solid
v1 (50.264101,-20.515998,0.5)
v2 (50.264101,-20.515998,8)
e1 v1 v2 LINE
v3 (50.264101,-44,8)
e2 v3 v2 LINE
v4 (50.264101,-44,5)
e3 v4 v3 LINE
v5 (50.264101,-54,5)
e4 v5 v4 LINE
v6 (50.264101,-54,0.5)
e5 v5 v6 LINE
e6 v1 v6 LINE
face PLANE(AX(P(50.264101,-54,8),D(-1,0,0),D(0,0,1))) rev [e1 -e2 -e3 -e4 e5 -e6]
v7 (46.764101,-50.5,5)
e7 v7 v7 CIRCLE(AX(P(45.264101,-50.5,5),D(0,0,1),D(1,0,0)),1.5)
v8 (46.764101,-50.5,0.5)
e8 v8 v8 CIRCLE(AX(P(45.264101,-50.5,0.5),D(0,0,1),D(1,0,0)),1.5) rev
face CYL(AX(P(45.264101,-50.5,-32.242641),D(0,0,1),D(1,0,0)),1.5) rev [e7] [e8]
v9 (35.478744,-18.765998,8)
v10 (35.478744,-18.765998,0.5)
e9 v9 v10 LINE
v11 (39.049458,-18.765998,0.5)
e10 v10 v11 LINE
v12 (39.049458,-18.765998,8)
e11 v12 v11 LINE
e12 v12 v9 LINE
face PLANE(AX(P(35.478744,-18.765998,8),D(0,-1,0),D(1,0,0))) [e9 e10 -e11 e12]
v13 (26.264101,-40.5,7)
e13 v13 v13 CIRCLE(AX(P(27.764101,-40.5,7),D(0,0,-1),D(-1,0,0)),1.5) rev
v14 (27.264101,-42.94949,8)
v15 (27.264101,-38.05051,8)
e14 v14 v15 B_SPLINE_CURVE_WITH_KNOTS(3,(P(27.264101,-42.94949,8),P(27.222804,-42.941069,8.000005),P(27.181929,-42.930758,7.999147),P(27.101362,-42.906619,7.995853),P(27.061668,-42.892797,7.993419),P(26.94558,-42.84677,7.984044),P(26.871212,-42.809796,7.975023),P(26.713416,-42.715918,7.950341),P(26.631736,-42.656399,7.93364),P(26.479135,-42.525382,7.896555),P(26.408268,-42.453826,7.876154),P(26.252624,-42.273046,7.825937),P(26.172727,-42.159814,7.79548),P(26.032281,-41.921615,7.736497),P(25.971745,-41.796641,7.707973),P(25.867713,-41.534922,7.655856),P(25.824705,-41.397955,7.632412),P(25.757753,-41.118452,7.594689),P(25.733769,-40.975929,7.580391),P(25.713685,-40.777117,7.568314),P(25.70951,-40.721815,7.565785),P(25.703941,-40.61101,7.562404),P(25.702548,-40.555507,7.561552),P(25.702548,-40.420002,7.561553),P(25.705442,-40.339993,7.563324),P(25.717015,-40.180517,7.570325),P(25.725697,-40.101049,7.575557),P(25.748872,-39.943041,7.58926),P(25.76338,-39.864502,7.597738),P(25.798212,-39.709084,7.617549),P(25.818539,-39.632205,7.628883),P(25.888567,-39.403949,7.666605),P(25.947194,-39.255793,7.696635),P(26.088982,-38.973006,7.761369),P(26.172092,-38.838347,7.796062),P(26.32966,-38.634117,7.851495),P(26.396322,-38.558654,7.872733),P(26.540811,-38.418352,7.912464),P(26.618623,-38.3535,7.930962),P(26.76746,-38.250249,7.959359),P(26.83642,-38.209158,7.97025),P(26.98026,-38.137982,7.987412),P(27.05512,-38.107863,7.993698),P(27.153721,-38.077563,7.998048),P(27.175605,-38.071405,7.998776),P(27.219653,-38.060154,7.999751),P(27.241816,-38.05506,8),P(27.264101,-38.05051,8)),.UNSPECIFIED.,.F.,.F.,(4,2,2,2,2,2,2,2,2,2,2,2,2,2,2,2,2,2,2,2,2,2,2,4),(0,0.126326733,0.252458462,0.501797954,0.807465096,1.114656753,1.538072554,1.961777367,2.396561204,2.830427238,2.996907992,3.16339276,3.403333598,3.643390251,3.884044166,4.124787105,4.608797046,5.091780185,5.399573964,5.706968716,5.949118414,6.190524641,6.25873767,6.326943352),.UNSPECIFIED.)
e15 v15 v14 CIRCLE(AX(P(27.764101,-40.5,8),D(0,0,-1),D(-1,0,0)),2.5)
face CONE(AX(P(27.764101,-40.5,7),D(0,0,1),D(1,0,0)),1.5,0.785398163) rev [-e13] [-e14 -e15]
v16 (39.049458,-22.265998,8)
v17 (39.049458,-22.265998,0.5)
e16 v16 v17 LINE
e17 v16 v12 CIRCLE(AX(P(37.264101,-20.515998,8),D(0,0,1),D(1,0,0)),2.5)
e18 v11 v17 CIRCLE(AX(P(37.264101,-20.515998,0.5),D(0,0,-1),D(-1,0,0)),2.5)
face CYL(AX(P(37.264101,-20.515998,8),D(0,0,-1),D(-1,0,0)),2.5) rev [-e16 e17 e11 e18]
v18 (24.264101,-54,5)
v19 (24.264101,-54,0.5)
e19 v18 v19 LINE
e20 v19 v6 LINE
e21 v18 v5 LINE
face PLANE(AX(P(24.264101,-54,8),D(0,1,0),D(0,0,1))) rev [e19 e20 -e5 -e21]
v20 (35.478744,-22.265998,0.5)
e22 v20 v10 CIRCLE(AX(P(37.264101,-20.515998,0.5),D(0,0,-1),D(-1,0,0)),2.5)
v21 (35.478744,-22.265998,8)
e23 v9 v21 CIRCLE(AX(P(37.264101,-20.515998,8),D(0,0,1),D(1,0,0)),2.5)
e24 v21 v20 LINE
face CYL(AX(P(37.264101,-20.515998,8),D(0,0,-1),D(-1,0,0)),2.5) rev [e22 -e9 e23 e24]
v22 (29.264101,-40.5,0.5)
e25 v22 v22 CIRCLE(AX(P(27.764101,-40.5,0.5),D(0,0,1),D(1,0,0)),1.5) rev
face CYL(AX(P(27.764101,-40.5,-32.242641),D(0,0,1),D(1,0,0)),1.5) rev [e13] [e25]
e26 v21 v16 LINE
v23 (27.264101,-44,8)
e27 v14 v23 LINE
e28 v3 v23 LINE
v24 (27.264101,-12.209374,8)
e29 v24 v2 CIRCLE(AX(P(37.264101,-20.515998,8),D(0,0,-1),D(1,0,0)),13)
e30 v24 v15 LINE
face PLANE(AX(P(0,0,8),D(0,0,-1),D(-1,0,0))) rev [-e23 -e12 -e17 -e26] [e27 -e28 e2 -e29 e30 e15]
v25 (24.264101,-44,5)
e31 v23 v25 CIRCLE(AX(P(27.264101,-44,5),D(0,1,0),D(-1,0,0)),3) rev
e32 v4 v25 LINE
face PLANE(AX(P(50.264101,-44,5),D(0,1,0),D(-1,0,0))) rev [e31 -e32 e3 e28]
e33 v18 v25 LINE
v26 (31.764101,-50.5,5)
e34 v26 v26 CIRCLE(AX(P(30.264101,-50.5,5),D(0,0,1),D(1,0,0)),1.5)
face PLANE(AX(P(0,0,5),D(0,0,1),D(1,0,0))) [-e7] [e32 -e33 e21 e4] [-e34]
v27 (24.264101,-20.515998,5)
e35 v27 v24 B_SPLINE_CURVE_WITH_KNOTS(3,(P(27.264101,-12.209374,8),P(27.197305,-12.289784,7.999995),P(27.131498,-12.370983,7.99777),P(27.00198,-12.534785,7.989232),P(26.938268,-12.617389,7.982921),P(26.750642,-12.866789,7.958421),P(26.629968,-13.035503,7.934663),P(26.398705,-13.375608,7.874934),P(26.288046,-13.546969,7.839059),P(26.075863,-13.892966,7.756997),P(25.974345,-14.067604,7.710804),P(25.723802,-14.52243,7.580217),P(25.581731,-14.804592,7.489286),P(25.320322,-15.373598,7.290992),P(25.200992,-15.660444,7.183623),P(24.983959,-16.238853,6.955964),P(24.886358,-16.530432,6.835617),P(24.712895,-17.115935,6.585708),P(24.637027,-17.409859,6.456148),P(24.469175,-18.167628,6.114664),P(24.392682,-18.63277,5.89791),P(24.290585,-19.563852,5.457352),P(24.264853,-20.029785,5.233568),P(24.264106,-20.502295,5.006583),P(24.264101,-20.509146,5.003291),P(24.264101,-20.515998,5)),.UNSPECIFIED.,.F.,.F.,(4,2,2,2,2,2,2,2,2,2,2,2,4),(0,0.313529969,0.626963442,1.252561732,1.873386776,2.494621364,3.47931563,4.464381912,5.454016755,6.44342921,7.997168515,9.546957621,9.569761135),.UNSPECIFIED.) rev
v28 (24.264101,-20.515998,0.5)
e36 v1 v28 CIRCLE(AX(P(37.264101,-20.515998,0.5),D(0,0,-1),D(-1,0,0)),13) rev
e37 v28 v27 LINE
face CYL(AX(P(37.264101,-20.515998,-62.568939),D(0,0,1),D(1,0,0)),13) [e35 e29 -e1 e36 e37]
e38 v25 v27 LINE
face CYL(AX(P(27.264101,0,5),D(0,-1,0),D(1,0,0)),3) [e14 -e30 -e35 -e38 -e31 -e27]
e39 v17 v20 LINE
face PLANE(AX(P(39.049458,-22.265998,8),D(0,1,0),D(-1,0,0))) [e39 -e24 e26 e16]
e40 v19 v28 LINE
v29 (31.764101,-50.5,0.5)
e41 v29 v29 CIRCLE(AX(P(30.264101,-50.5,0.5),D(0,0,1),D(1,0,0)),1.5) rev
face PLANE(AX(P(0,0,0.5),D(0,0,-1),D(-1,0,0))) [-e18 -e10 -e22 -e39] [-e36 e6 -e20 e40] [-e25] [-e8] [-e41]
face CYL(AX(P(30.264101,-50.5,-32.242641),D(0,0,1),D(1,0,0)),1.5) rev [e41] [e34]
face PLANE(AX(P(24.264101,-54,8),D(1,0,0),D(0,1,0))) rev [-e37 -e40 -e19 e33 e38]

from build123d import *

# Parameters (mm, degrees)
SKETCH1_W           = 26
SKETCH1_H           = 50
BOSS_EXTRUDE1_DEPTH = 8
SKETCH2_W           = 26
SKETCH2_H           = 50
BOSS_EXTRUDE2_DEPTH = 8
SKETCH3_W           = 26
SKETCH3_H           = 7
BOSS_EXTRUDE3_DEPTH = 36
SKETCH4_R           = 8
SKETCH4_R_2         = 5
BOSS_EXTRUDE4_DEPTH = 10
FILLET2_R           = 3
SKETCH6_W           = 7
SKETCH6_H           = 17
BOSS_EXTRUDE5_DEPTH = 20
CHAMFER1_SIZE       = 2
CUT_EXTRUDE2_DEPTH  = 0.5
CUT_EXTRUDE3_DEPTH  = 0.5
CUT_EXTRUDE4_REACH  = 90.986
SKETCH11_W          = 26
SKETCH11_H          = 10
CUT_EXTRUDE5_DEPTH  = 3
SKETCH12_W          = 26
SKETCH12_H          = 10
CUT_EXTRUDE6_DEPTH  = 3
CUT_EXTRUDE7_REACH  = 90.986
SKETCH13_R          = 1.5
SKETCH14_W          = 39.670907723
SKETCH14_H          = 70.738486061
CUT_EXTRUDE8_DEPTH  = 8
SKETCH15_W          = 26
SKETCH15_H          = 39.127202372
CUT_EXTRUDE9_DEPTH  = 28.5


with BuildPart() as part:
    # Sketch1 → Boss-Extrude1 (new body)
    with BuildSketch(Plane.XY):
        with Locations((37.264100782, -29)):
            Rectangle(SKETCH1_W, SKETCH1_H)
        with BuildLine():
            Line((39.049457889, -22.265997948), (35.478743675, -22.265997948))
            ThreePointArc((35.478743675, -22.265997948), (34.764100782, -20.515997948), (35.478743675, -18.765997947))
            Line((35.478743675, -18.765997947), (39.049457889, -18.765997947))
            ThreePointArc((39.049457889, -18.765997947), (39.764100782, -20.515997948), (39.049457889, -22.265997948))
        make_face(mode=Mode.SUBTRACT)
    extrude(amount=BOSS_EXTRUDE1_DEPTH)



with BuildPart() as body_2:
    # Sketch2 → Boss-Extrude2 (new body)
    with BuildSketch(Plane(origin=(0, 0, -20), x_dir=(-1, 0, 0), z_dir=(0, 0, -1))):
        with Locations((-37.264100782, -29)):
            Rectangle(SKETCH2_W, SKETCH2_H)
        with BuildLine():
            Line((-39.049457889, -18.765997947), (-35.478743675, -18.765997947))
            ThreePointArc((-35.478743675, -18.765997947), (-34.764100782, -20.515997948), (-35.478743675, -22.265997948))
            Line((-35.478743675, -22.265997948), (-39.049457889, -22.265997948))
            ThreePointArc((-39.049457889, -22.265997948), (-39.764100782, -20.515997948), (-39.049457889, -18.765997947))
        make_face(mode=Mode.SUBTRACT)
    extrude(amount=BOSS_EXTRUDE2_DEPTH)


with BuildPart() as part_1:
    add(part.part)

    add(body_2.part)  # Boss-Extrude3 merges body 2
    # Sketch3 → Boss-Extrude3 (add)
    with BuildSketch(Plane.XY.offset(8)):
        with Locations((37.264100782, -50.5)):
            Rectangle(SKETCH3_W, SKETCH3_H)
    extrude(amount=-BOSS_EXTRUDE3_DEPTH)

    # Sketch4 → Boss-Extrude4 (add)
    with BuildSketch(Plane.XZ.offset(54)):
        with Locations(Location((37.264100782, -10, 0), (0, 0, 90))):
            Circle(SKETCH4_R)
        with Locations(Location((37.264100782, -10, 0), (0, 0, 270))):
            Circle(SKETCH4_R_2, mode=Mode.SUBTRACT)
    extrude(amount=BOSS_EXTRUDE4_DEPTH)

    # Fillet2
    fillet2_edges = [part_1.edges().sort_by_distance(p)[0] for p in [
        (24.264100782, -29, 8),
        (24.264100782, -29, -28),
    ]]
    fillet(fillet2_edges, radius=FILLET2_R)

    # Sketch6 → Boss-Extrude5 (add)
    with BuildSketch(Plane.XY.offset(-20)):
        with Locations((27.764100782, -45.5)):
            Rectangle(SKETCH6_W, SKETCH6_H)
    extrude(amount=BOSS_EXTRUDE5_DEPTH)

    # Chamfer1
    chamfer1_edges = [part_1.edges().sort_by_distance(p)[0] for p in [
        (37.264100782, -54, -18),
    ]]
    chamfer(chamfer1_edges, length=CHAMFER1_SIZE)

    # Sketch7 → Cut-Extrude2 (cut)
    with BuildSketch(Plane(origin=(0, 0, 0), x_dir=(-1, 0, 0), z_dir=(0, 0, -1))):
        Polygon((-50.264100782, -4), (-50.264100782, -47), (-31.264100782, -47), (-31.264100782, -37), (-24.264100782, -37), (-24.264100782, -4), align=None)
    extrude(amount=-CUT_EXTRUDE2_DEPTH, mode=Mode.SUBTRACT)

    # Sketch8 → Cut-Extrude3 (cut)
    with BuildSketch(Plane.XY.offset(-20)):
        Polygon((50.264100782, -47), (50.264100782, -4), (24.264100782, -4), (24.264100782, -37), (31.264100782, -37), (31.264100782, -47), align=None)
    extrude(amount=-CUT_EXTRUDE3_DEPTH, mode=Mode.SUBTRACT)

    # Cut-Extrude4: up to this face of the body (flat: up to its plane)
    cut_extrude4_end = Plane(part_1.part.faces().sort_by_distance((38.785185957, -29.119257779, -28))[0])
    # Sketch10 → Cut-Extrude4 (cut, up to the picked face)
    with BuildSketch(Plane.XY.offset(8), mode=Mode.PRIVATE) as cut_extrude4_sk1:
        with BuildLine():
            Line((50.264100782, -20.515997948), (50.264100782, 2.26582648))
            Line((50.264100782, 2.26582648), (24.264100782, 2.26582648))
            Line((24.264100782, 2.26582648), (24.264100782, -20.515997948))
            ThreePointArc((24.264100782, -20.515997948), (37.264100782, -7.515997948), (50.264100782, -20.515997948))
        make_face()
    cut_extrude4_tool1 = split(extrude(cut_extrude4_sk1.sketch, amount=-CUT_EXTRUDE4_REACH, mode=Mode.PRIVATE), bisect_by=cut_extrude4_end, keep=Keep.BOTH, mode=Mode.PRIVATE)
    add(cut_extrude4_tool1.solids().sort_by(Axis((37.264101, -4.354837, 8), (0, 0, -1)))[0], mode=Mode.SUBTRACT)

    # Sketch11 → Cut-Extrude5 (cut)
    with BuildSketch(Plane.XY.offset(8)):
        with Locations((37.264100782, -49)):
            Rectangle(SKETCH11_W, SKETCH11_H)
    extrude(amount=-CUT_EXTRUDE5_DEPTH, mode=Mode.SUBTRACT)

    # Sketch12 → Cut-Extrude6 (cut)
    with BuildSketch(Plane(origin=(0, 0, -28), x_dir=(-1, 0, 0), z_dir=(0, 0, -1))):
        with Locations((-37.264100782, -49)):
            Rectangle(SKETCH12_W, SKETCH12_H)
    extrude(amount=-CUT_EXTRUDE6_DEPTH, mode=Mode.SUBTRACT)

    # Cut-Extrude7: up to this face of the body (flat: up to its plane)
    cut_extrude7_end = Plane(part_1.part.faces().sort_by_distance((38.560022368, -26.898937337, -28))[0])
    # Sketch13 → Cut-Extrude7 (cut, up to the picked face)
    with BuildSketch(Plane.XY.offset(8), mode=Mode.PRIVATE) as cut_extrude7_sk1:
        with Locations((45.264100782, -50.5)):
            Circle(SKETCH13_R)
    cut_extrude7_tool1 = split(extrude(cut_extrude7_sk1.sketch, amount=-CUT_EXTRUDE7_REACH, mode=Mode.PRIVATE), bisect_by=cut_extrude7_end, keep=Keep.BOTH, mode=Mode.PRIVATE)
    # Sketch13 → Cut-Extrude7 (cut, up to the picked face)
    with BuildSketch(Plane.XY.offset(8), mode=Mode.PRIVATE) as cut_extrude7_sk2:
        with Locations((30.264100782, -50.5)):
            Circle(SKETCH13_R)
    cut_extrude7_tool2 = split(extrude(cut_extrude7_sk2.sketch, amount=-CUT_EXTRUDE7_REACH, mode=Mode.PRIVATE), bisect_by=cut_extrude7_end, keep=Keep.BOTH, mode=Mode.PRIVATE)
    # Sketch13 → Cut-Extrude7 (cut, up to the picked face)
    with BuildSketch(Plane.XY.offset(8), mode=Mode.PRIVATE) as cut_extrude7_sk3:
        with Locations(Location((27.764100782, -40.5, 0), (0, 0, 109.471220634))):
            Circle(SKETCH13_R)
    cut_extrude7_tool3 = split(extrude(cut_extrude7_sk3.sketch, amount=-CUT_EXTRUDE7_REACH, mode=Mode.PRIVATE), bisect_by=cut_extrude7_end, keep=Keep.BOTH, mode=Mode.PRIVATE)
    add(cut_extrude7_tool1.solids().sort_by(Axis((45.264101, -50.5, 8), (0, 0, -1)))[0], mode=Mode.SUBTRACT)
    add(cut_extrude7_tool2.solids().sort_by(Axis((30.264101, -50.5, 8), (0, 0, -1)))[0], mode=Mode.SUBTRACT)
    add(cut_extrude7_tool3.solids().sort_by(Axis((27.764101, -40.5, 8), (0, 0, -1)))[0], mode=Mode.SUBTRACT)

    # Sketch14 → Cut-Extrude8 (cut)
    with BuildSketch(Plane(origin=(0, 0, -28), x_dir=(-1, 0, 0), z_dir=(0, 0, -1))):
        with Locations((-35.76618016, -37.229796089)):
            Rectangle(SKETCH14_W, SKETCH14_H)
    extrude(amount=-CUT_EXTRUDE8_DEPTH, mode=Mode.SUBTRACT)

    # Chamfer2: read off the stored shape, not the designer's step
    # Chamfer2 outline → Chamfer2 (revolve, cut)
    with BuildSketch(Plane(origin=(27.764100782, -40.5, 0), x_dir=(1, 0, 0), z_dir=(0, -1, 0))):
        Polygon((1.5, 8.000002987), (1.5, 7), (2.500002987, 8.000002987), align=None)
    revolve(axis=Axis((27.764100782, -40.5, 0), (0, 0, 1)), mode=Mode.SUBTRACT)

    # Sketch15 → Cut-Extrude9 (cut)
    with BuildSketch(Plane(origin=(0, 0, 0.5), x_dir=(-1, 0, 0), z_dir=(0, 0, -1))):
        with Locations((-37.264100782, -56.563601186)):
            Rectangle(SKETCH15_W, SKETCH15_H)
    extrude(amount=CUT_EXTRUDE9_DEPTH, mode=Mode.SUBTRACT)


solid = part_1.part
